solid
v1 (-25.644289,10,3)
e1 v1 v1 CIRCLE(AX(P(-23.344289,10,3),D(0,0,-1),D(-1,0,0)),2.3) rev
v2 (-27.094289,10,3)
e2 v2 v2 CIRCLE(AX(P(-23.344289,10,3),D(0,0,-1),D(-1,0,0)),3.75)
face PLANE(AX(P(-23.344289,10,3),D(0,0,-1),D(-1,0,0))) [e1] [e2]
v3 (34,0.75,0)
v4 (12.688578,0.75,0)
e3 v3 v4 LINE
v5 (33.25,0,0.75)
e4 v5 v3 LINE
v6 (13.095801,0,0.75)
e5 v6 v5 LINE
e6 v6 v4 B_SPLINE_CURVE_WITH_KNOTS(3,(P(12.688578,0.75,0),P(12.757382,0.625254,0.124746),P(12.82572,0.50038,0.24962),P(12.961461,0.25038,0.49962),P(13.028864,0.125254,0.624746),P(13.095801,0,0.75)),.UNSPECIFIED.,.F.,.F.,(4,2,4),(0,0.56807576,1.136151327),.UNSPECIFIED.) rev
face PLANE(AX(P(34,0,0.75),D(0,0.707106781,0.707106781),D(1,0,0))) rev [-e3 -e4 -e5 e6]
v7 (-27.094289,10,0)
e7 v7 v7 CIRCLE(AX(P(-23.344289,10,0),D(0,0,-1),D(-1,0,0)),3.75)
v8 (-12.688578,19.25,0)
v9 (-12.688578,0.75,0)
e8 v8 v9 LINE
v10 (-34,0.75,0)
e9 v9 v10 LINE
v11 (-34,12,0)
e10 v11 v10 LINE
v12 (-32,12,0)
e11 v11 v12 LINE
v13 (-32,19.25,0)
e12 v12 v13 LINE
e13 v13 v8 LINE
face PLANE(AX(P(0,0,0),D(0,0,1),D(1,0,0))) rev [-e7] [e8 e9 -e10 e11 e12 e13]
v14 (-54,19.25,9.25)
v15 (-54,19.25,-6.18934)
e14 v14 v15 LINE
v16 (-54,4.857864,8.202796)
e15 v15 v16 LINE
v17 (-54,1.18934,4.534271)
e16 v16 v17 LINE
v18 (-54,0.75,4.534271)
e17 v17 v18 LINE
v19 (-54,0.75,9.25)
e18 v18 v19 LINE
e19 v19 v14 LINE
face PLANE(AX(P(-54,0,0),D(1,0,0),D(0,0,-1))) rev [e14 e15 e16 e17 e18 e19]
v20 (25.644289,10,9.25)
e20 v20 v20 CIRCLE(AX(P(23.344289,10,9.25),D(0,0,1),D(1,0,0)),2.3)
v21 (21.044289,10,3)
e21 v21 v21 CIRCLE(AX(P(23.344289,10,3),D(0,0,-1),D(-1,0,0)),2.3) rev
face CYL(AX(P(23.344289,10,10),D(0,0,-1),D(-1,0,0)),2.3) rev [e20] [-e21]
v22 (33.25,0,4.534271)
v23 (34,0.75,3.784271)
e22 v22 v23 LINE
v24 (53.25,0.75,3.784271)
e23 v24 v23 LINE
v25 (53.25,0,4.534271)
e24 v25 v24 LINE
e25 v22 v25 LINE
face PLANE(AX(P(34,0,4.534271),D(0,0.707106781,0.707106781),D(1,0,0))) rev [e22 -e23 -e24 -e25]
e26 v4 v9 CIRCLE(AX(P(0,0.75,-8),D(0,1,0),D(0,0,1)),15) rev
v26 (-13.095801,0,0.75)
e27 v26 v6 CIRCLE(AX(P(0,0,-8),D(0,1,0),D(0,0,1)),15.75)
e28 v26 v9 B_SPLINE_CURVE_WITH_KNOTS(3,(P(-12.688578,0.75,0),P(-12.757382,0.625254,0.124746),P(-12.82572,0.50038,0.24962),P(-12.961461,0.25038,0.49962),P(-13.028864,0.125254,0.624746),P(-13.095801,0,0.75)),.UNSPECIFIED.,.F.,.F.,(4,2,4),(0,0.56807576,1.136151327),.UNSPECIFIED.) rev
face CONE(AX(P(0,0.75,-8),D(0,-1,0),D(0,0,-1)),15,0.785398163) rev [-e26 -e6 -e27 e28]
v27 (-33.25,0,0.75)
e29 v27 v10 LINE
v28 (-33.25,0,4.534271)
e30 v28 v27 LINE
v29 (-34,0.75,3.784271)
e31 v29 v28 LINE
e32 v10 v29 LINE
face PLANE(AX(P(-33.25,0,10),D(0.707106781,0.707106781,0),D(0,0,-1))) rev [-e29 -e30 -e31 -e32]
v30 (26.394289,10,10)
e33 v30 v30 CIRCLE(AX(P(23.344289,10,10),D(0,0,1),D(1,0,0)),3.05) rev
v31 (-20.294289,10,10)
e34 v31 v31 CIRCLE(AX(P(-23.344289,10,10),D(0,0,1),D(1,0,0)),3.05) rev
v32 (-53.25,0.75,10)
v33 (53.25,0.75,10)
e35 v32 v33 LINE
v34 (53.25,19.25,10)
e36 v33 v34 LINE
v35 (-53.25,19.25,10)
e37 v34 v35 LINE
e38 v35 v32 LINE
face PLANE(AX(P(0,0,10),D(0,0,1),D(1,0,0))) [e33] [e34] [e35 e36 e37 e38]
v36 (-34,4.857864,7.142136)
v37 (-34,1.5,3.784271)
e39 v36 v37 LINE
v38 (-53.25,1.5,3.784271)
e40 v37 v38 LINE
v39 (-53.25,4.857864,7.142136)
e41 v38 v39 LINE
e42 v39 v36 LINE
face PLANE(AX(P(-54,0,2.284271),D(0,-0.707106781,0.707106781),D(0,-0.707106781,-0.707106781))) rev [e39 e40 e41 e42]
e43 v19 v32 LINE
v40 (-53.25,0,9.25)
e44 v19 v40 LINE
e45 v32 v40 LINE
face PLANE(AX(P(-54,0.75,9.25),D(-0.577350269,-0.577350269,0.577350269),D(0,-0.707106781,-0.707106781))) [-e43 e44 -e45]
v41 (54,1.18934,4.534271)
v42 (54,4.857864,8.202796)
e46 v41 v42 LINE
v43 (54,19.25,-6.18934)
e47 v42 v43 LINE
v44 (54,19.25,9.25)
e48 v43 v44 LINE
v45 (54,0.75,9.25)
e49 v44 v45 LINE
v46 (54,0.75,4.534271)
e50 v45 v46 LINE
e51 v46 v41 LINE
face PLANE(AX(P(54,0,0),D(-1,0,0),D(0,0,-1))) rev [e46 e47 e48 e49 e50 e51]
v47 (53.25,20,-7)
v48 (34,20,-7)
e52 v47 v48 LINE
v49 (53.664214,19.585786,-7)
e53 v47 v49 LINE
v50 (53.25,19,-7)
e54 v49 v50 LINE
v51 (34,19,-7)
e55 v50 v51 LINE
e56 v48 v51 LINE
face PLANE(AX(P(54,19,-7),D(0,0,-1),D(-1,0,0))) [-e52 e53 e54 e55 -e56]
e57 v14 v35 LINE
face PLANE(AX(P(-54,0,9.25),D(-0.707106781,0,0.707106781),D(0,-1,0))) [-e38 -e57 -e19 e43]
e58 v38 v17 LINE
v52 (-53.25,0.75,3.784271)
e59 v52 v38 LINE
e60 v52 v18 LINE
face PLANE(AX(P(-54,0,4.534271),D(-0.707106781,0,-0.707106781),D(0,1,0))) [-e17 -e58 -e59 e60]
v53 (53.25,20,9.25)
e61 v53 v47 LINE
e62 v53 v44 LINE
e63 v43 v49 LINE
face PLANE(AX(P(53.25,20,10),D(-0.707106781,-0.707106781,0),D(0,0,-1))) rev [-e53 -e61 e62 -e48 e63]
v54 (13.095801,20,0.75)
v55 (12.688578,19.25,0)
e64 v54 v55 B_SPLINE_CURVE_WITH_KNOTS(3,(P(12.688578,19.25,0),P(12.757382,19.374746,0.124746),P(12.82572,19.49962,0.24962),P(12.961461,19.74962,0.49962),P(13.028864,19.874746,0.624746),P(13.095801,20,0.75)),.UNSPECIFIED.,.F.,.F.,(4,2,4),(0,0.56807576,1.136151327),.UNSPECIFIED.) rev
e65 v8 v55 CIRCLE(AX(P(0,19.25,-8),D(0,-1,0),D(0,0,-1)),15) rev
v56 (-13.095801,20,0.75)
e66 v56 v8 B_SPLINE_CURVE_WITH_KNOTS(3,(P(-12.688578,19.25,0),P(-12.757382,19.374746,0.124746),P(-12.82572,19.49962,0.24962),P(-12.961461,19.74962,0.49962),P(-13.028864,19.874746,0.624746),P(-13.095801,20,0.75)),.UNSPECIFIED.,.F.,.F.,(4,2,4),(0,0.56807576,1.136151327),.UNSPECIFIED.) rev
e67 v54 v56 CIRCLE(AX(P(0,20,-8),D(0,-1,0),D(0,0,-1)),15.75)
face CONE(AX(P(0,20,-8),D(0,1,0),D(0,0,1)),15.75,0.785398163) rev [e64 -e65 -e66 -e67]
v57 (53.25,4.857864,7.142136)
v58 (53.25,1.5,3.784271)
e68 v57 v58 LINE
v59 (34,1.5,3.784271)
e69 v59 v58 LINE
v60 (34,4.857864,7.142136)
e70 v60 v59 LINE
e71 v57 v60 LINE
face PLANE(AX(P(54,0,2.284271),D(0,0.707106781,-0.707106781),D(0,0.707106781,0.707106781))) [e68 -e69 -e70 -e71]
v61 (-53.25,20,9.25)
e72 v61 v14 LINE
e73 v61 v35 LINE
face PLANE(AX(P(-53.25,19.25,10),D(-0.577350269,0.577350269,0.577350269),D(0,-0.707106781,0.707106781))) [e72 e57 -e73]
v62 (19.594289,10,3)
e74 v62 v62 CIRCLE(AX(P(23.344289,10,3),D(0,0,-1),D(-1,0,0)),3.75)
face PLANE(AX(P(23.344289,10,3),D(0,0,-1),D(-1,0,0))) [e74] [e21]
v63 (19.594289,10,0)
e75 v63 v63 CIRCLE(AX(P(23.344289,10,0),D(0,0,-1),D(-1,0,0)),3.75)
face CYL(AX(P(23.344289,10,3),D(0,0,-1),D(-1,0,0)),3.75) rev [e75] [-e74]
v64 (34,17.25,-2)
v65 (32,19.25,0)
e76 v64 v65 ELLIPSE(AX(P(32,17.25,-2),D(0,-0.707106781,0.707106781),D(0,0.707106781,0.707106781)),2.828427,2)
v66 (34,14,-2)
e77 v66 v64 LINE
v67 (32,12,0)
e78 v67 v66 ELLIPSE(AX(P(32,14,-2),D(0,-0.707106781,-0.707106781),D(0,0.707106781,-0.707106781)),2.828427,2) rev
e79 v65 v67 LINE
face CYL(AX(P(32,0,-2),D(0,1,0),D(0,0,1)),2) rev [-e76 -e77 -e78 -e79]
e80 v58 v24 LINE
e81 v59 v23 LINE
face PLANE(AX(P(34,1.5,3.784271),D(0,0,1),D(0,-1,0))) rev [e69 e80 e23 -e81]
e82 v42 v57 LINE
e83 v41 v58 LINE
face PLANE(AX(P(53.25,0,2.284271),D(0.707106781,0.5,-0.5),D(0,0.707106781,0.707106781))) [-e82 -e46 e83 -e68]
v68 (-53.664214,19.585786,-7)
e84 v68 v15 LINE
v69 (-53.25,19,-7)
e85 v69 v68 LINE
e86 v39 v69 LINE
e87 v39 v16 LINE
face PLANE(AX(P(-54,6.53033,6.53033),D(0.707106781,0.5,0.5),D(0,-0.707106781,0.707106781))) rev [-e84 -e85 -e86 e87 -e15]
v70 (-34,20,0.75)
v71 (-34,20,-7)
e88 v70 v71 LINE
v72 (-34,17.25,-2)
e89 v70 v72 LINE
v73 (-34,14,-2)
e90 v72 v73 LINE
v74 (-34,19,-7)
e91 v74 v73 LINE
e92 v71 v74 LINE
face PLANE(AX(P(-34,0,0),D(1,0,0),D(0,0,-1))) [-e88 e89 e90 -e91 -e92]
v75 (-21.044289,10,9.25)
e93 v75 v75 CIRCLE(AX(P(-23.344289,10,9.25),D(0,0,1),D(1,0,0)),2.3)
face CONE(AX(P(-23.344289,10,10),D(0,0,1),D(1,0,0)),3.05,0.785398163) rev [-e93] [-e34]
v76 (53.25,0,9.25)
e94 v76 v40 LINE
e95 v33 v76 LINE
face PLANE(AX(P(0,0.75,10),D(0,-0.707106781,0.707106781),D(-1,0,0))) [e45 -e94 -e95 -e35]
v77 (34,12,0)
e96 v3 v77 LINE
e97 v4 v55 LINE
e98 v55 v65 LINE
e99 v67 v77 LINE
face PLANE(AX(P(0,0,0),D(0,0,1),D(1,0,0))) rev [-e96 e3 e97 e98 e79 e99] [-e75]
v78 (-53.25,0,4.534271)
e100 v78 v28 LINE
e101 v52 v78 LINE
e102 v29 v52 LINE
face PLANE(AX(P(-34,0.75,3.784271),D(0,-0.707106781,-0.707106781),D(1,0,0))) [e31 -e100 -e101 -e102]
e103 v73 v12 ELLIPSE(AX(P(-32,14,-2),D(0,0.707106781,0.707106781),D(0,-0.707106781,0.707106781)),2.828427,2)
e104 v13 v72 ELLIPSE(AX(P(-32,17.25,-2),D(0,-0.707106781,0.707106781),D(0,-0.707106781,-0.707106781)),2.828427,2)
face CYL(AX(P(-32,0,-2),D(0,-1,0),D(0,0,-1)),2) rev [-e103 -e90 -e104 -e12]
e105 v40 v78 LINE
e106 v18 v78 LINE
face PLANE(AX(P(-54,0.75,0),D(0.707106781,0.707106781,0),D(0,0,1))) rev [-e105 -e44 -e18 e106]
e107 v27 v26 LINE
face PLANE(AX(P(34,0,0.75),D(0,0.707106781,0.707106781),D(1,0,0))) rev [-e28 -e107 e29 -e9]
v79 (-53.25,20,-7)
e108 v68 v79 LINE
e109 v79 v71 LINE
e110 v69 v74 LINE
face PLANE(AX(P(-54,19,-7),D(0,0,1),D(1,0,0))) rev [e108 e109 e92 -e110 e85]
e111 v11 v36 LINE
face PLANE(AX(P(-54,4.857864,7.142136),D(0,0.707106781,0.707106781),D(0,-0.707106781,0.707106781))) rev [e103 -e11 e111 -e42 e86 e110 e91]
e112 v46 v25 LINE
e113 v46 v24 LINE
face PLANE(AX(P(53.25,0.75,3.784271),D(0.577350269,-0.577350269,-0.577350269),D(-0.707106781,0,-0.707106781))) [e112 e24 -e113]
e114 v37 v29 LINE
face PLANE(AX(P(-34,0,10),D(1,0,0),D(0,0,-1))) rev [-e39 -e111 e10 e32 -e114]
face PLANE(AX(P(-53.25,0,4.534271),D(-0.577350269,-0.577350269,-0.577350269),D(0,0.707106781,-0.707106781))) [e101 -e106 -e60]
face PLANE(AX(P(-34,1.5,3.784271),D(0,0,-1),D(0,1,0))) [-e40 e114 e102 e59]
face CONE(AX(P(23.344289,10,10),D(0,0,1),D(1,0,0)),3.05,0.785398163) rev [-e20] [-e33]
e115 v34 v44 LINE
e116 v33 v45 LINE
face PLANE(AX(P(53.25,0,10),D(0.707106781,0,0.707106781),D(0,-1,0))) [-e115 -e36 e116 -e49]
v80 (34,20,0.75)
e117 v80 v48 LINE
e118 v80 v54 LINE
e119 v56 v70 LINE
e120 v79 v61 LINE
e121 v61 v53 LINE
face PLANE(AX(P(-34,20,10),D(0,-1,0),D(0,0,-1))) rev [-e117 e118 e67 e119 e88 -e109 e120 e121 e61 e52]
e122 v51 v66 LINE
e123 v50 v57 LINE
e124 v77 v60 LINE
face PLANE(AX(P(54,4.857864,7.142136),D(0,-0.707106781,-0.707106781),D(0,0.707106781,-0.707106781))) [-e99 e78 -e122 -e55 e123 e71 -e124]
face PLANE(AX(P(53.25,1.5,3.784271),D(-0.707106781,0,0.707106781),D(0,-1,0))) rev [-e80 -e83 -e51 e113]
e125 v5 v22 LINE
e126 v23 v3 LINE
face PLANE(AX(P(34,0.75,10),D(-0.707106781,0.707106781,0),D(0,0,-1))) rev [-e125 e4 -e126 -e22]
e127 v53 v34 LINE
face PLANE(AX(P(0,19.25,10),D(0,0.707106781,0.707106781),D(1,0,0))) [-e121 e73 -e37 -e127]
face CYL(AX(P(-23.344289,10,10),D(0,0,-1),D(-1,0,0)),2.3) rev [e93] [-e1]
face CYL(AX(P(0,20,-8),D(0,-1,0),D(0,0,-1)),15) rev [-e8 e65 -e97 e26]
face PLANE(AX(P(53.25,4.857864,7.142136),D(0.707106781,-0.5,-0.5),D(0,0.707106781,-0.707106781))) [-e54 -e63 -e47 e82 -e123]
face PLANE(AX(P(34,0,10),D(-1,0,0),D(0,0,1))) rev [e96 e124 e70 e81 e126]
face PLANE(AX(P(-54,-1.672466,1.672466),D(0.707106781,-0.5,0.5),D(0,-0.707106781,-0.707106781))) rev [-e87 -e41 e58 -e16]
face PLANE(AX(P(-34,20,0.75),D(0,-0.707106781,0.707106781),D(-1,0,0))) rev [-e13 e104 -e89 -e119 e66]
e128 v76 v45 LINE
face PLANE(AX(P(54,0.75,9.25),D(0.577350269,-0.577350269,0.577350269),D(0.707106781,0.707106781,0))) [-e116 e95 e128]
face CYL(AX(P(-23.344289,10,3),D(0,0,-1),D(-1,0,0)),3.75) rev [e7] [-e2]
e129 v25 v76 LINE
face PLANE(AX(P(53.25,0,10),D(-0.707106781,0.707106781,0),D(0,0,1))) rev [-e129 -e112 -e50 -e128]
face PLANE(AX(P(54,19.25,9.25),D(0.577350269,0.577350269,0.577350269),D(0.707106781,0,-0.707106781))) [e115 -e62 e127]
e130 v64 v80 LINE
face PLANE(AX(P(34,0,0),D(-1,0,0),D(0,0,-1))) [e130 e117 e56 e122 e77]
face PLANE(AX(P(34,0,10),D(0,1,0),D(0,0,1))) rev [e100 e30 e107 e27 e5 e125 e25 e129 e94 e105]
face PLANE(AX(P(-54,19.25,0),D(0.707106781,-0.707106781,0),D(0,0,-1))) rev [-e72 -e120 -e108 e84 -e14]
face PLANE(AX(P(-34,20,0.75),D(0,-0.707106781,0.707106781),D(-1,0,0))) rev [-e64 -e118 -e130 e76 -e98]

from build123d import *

# Parameters (mm, degrees)
SKIZZE1_W                       = 68
SKIZZE1_H                       = 20
AUFSATZ_LINEAR_AUSTRAGEN1_DEPTH = 10
AUFSATZ_LINEAR_AUSTRAGEN2_DEPTH = 20
SKIZZE3_R                       = 15
SCHNITT_LINEAR_AUSTRAGEN1_DEPTH = 20
SKIZZE4_R                       = 2.3
SCHNITT_LINEAR_AUSTRAGEN2_DEPTH = 10
SKIZZE5_R                       = 3.75
SCHNITT_LINEAR_AUSTRAGEN3_DEPTH = 3
SCHNITT_LINEAR_AUSTRAGEN4_DEPTH = 20
VERRUNDUNG1_R                   = 2


with BuildPart() as part:
    # Skizze1 → Aufsatz-Linear austragen1 (new body)
    with BuildSketch(Plane.XY):
        with Locations((0, 10)):
            Rectangle(SKIZZE1_W, SKIZZE1_H)
    extrude(amount=AUFSATZ_LINEAR_AUSTRAGEN1_DEPTH)

    # Skizze2 → Aufsatz-Linear austragen2 (add)
    with BuildSketch(Plane.ZY.offset(34)):
        Polygon((7.142135624, 4.857864376), (-7, 19), (-7, 20), (0, 20), (10, 20), (10, 0), (2.284271247, 0), align=None)
    aufsatz_linear_austragen2 = extrude(amount=AUFSATZ_LINEAR_AUSTRAGEN2_DEPTH)

    # Spiegeln1: Aufsatz-Linear austragen2 across plane
    add(aufsatz_linear_austragen2.mirror(Plane(origin=(0, 0, 0), x_dir=(0, 0, 1), z_dir=(1, 0, 0))))

    # Skizze3 → Schnitt-Linear austragen1 (cut)
    with BuildSketch(Plane.XZ):
        with Locations((0, -8)):
            Circle(SKIZZE3_R)
    extrude(amount=-SCHNITT_LINEAR_AUSTRAGEN1_DEPTH, mode=Mode.SUBTRACT)

    # Skizze4 → Schnitt-Linear austragen2 (cut)
    with BuildSketch(Plane(origin=(0, 0, 0), x_dir=(-1, 0, 0), z_dir=(0, 0, -1))):
        with Locations((-23.34428877, 10)):
            Circle(SKIZZE4_R)
        with Locations(Location((23.34428877, 10, 0), (0, 0, 180))):
            Circle(SKIZZE4_R)
    extrude(amount=-SCHNITT_LINEAR_AUSTRAGEN2_DEPTH, mode=Mode.SUBTRACT)

    # Skizze5 → Schnitt-Linear austragen3 (cut)
    with BuildSketch(Plane(origin=(0, 0, 0), x_dir=(-1, 0, 0), z_dir=(0, 0, -1))):
        with Locations((-23.34428877, 10)):
            Circle(SKIZZE5_R)
        with Locations((23.34428877, 10)):
            Circle(SKIZZE5_R)
    extrude(amount=-SCHNITT_LINEAR_AUSTRAGEN3_DEPTH, mode=Mode.SUBTRACT)

    # Skizze6 → Schnitt-Linear austragen4 (cut)
    with BuildSketch(Plane(origin=(54, 0, 0), x_dir=(0, 0, -1), z_dir=(1, 0, 0))):
        Polygon((-3.784271247, 1.5), (-3.784271247, 0), (-1.831080062, -0.949282867), (-1.396270995, 1.527811212), align=None)
    schnitt_linear_austragen4 = extrude(amount=-SCHNITT_LINEAR_AUSTRAGEN4_DEPTH, mode=Mode.SUBTRACT)

    # Spiegeln2: Schnitt-Linear austragen4 across plane
    add(schnitt_linear_austragen4.mirror(Plane(origin=(0, 0, 0), x_dir=(0, 0, 1), z_dir=(1, 0, 0))), mode=Mode.SUBTRACT)

    # Fase1
    # the kernel refuses this chamfer: 0.75 mm, written as the material it takes off along each edge
    with BuildSketch(Plane(origin=(53.5, 19.5, 9.5), x_dir=(-0.7071067811865476, 0.7071067811865476, 0), z_dir=(0.5773502691896257, 0.5773502691896257, 0.5773502691896257)), Plane(origin=(-53.5, 19.5, 9.5), x_dir=(-0.7071067811865476, -0.7071067811865476, 0), z_dir=(-0.5773502691896257, 0.5773502691896257, 0.5773502691896257))) as fase1_piece_1:
        Polygon((-0.530330086, -0.306186218), (0.530330086, -0.306186218), (0, 0.612372436), align=None)
    extrude(amount=0.952627944, mode=Mode.SUBTRACT)
    with BuildSketch(Plane(origin=(53.5, 0.5, 4.284271247), x_dir=(-0.7071067811865476, -1.2560739669470201e-15, -0.7071067811865476), z_dir=(0.5773502691896262, -0.577350269189626, -0.5773502691896252)), Plane(origin=(-53.5, 0.5, 9.5), x_dir=(-0.7071067811865476, 0.7071067811865474, 0), z_dir=(-0.5773502691896256, -0.5773502691896258, 0.5773502691896258)), Plane(origin=(-53.5, 0.5, 4.284271247), x_dir=(0, 0.707106781186547, -0.707106781186548), z_dir=(-0.577350269189626, -0.5773502691896262, -0.5773502691896253)), Plane(origin=(53.5, 0.5, 9.5), x_dir=(-0.7071067811865476, -0.7071067811865475, 0), z_dir=(0.5773502691896257, -0.5773502691896258, 0.5773502691896258))) as fase1_piece_2:
        Polygon((-0.530330086, 0.306186218), (0.530330086, 0.306186218), (0, -0.612372436), align=None)
    extrude(amount=0.952627944, mode=Mode.SUBTRACT)
    with BuildSketch(Plane(origin=(-23.34428877, 10, 10), x_dir=(1, 0, 0), z_dir=(0, 1, 0))) as fase1_piece_3:
        with BuildLine():
            Line((2.278786797, 0.771213203), (3.071213203, -0.021213203))
            Line((3.071213203, -0.021213203), (3.071213203, -0.036213203))
            ThreePointArc((3.071213203, -0.036213203), (2.685606602, -0.015), (2.3, -0.015))
            Line((2.3, -0.015), (2.285, 0))
            ThreePointArc((2.285, 0), (2.285, 0.385606602), (2.263786797, 0.771213203))
            Line((2.263786797, 0.771213203), (2.278786797, 0.771213203))
        make_face()
    revolve(axis=Axis((-23.34428877, 10, 10), (0, 0, -1)), mode=Mode.SUBTRACT)
    with BuildSketch(Plane(origin=(23.34428877, 10, 10), x_dir=(-1, 0, 0), z_dir=(0, -1, 0))) as fase1_piece_4:
        with BuildLine():
            Line((3.071213203, -0.021213203), (2.278786797, 0.771213203))
            Line((2.278786797, 0.771213203), (2.263786797, 0.771213203))
            ThreePointArc((2.263786797, 0.771213203), (2.285, 0.385606602), (2.285, 0))
            Line((2.285, 0), (2.3, -0.015))
            ThreePointArc((2.3, -0.015), (2.685606602, -0.015), (3.071213203, -0.036213203))
            Line((3.071213203, -0.036213203), (3.071213203, -0.021213203))
        make_face()
    revolve(axis=Axis((23.34428877, 10, 10), (0, 0, -1)), mode=Mode.SUBTRACT)
    with BuildSketch(Plane(origin=(54, 20, 0), x_dir=(-0.9996219169112968, 0.027495876610586893, 0), z_dir=(0, 0, 1))) as fase1_piece_5:
        with BuildLine():
            Line((0.771504896, 0), (-0.042410366, 0.770338345))
            Line((-0.042410366, 0.770338345), (-0.057404695, 0.769925907))
            ThreePointArc((-0.057404695, 0.769925907), (-0.02559692, 0.385048372), (-0.014994329, -0.000412438))
            Line((-0.014994329, -0.000412438), (0.000412438, -0.014994329))
            ThreePointArc((0.000412438, -0.014994329), (0.385873249, -0.004391737), (0.771917335, -0.014994329))
            Line((0.771917335, -0.014994329), (0.771504896, 0))
        make_face()
    extrude(amount=11.928762241, mode=Mode.SUBTRACT)
    with BuildSketch(Plane(origin=(54, 4.857864376, 7.142135624), x_dir=(-0.9996219169112968, -0.01944252080601377, -0.01944252080601398), z_dir=(0, 0.7071067811865513, -0.7071067811865438)), Plane(origin=(55.928762241, 0, 3.784271247), x_dir=(0, -0.027495876610586376, 0.9996219169112968), z_dir=(-1, 0, 0))) as fase1_piece_6:
        with BuildLine():
            Line((0.771504896, 0), (-0.042410366, 0.770338345))
            Line((-0.042410366, 0.770338345), (-0.057404695, 0.769925907))
            ThreePointArc((-0.057404695, 0.769925907), (-0.02559692, 0.385048372), (-0.014994329, -0.000412438))
            Line((-0.014994329, -0.000412438), (0.000412438, -0.014994329))
            ThreePointArc((0.000412438, -0.014994329), (0.385873249, -0.004391737), (0.771917335, -0.014994329))
            Line((0.771917335, -0.014994329), (0.771504896, 0))
        make_face()
    extrude(amount=21.928762241, mode=Mode.SUBTRACT)
    with BuildSketch(Plane(origin=(54, 0.13615914, 2.420430388), x_dir=(-0.9996219169112968, 0.01944252080601445, -0.019442520806014447), z_dir=(0, 0.7071067811865475, 0.7071067811865476))) as fase1_piece_7:
        with BuildLine():
            Line((0.771504896, 0), (-0.042410366, 0.770338345))
            Line((-0.042410366, 0.770338345), (-0.057404695, 0.769925907))
            ThreePointArc((-0.057404695, 0.769925907), (-0.02559692, 0.385048372), (-0.014994329, -0.000412438))
            Line((-0.014994329, -0.000412438), (0.000412438, -0.014994329))
            ThreePointArc((0.000412438, -0.014994329), (0.385873249, -0.004391737), (0.771917335, -0.014994329))
            Line((0.771917335, -0.014994329), (0.771504896, 0))
        make_face()
    extrude(amount=6.677499583, mode=Mode.SUBTRACT)
    with BuildSketch(Plane(origin=(54, 3.428762241, 3.784271247), x_dir=(0.027495876610582164, 0, 0.9996219169112969), z_dir=(0, -1, 0)), Plane(origin=(-54, 3.428762241, 3.784271247), x_dir=(0.9996219169112968, 0, -0.027495876610586317), z_dir=(0, -1, 0))) as fase1_piece_8:
        with BuildLine():
            Line((0.771504896, 0), (-0.042410366, 0.770338345))
            Line((-0.042410366, 0.770338345), (-0.057404695, 0.769925907))
            ThreePointArc((-0.057404695, 0.769925907), (-0.02559692, 0.385048372), (-0.014994329, -0.000412438))
            Line((-0.014994329, -0.000412438), (0.000412438, -0.014994329))
            ThreePointArc((0.000412438, -0.014994329), (0.385873249, -0.004391737), (0.771917335, -0.014994329))
            Line((0.771917335, -0.014994329), (0.771504896, 0))
        make_face()
    extrude(amount=5.357524482, mode=Mode.SUBTRACT)
    with BuildSketch(Plane(origin=(-54, 0, 11.928762241), x_dir=(0.9996219169112968, -0.027495876610586487, 0), z_dir=(0, 0, -1))) as fase1_piece_9:
        with BuildLine():
            Line((0.771504896, 0), (-0.042410366, -0.770338345))
            Line((-0.042410366, -0.770338345), (-0.057404695, -0.769925907))
            ThreePointArc((-0.057404695, -0.769925907), (-0.02559692, -0.385048372), (-0.014994329, 0.000412438))
            Line((-0.014994329, 0.000412438), (0.000412438, 0.014994329))
            ThreePointArc((0.000412438, 0.014994329), (0.385873249, 0.004391737), (0.771917335, 0.014994329))
            Line((0.771917335, 0.014994329), (0.771504896, 0))
        make_face()
    extrude(amount=10.073253234, mode=Mode.SUBTRACT)
    with BuildSketch(Plane(origin=(54, 21.928762241, 10), x_dir=(-0.9996219169112968, 0, 0.027495876610586893), z_dir=(0, -1, 0)), Plane(origin=(-54, 21.928762241, 10), x_dir=(-0.027495876610582164, 0, -0.9996219169112969), z_dir=(0, -1, 0))) as fase1_piece_10:
        with BuildLine():
            Line((0.771504896, 0), (-0.042410366, 0.770338345))
            Line((-0.042410366, 0.770338345), (-0.057404695, 0.769925907))
            ThreePointArc((-0.057404695, 0.769925907), (-0.02559692, 0.385048372), (-0.014994329, -0.000412438))
            Line((-0.014994329, -0.000412438), (0.000412438, -0.014994329))
            ThreePointArc((0.000412438, -0.014994329), (0.385873249, -0.004391737), (0.771917335, -0.014994329))
            Line((0.771917335, -0.014994329), (0.771504896, 0))
        make_face()
    extrude(amount=23.857524482, mode=Mode.SUBTRACT)
    with BuildSketch(Plane(origin=(55.928762241, 20, 10), x_dir=(0, 0.027495876610586768, -0.9996219169112968), z_dir=(-1, 0, 0))) as fase1_piece_11:
        with BuildLine():
            Line((0.771504896, 0), (-0.042410366, 0.770338345))
            Line((-0.042410366, 0.770338345), (-0.057404695, 0.769925907))
            ThreePointArc((-0.057404695, 0.769925907), (-0.02559692, 0.385048372), (-0.014994329, -0.000412438))
            Line((-0.014994329, -0.000412438), (0.000412438, -0.014994329))
            ThreePointArc((0.000412438, -0.014994329), (0.385873249, -0.004391737), (0.771917335, -0.014994329))
            Line((0.771917335, -0.014994329), (0.771504896, 0))
        make_face()
    extrude(amount=111.857524482, mode=Mode.SUBTRACT)
    with BuildSketch(Plane(origin=(55.928762241, 0, 10), x_dir=(0, -0.02749587661058636, -0.9996219169112968), z_dir=(-1, 0, 0))) as fase1_piece_12:
        with BuildLine():
            Line((0.771504896, 0), (-0.042410366, -0.770338345))
            Line((-0.042410366, -0.770338345), (-0.057404695, -0.769925907))
            ThreePointArc((-0.057404695, -0.769925907), (-0.02559692, -0.385048372), (-0.014994329, 0.000412438))
            Line((-0.014994329, 0.000412438), (0.000412438, 0.014994329))
            ThreePointArc((0.000412438, 0.014994329), (0.385873249, 0.004391737), (0.771917335, 0.014994329))
            Line((0.771917335, 0.014994329), (0.771504896, 0))
        make_face()
    extrude(amount=111.857524482, mode=Mode.SUBTRACT)
    with BuildSketch(Plane(origin=(54, 0, 11.928762241), x_dir=(-0.9996219169112968, -0.027495876610586487, 0), z_dir=(0, 0, -1))) as fase1_piece_13:
        with BuildLine():
            Line((0.771504896, 0), (-0.042410366, 0.770338345))
            Line((-0.042410366, 0.770338345), (-0.057404695, 0.769925907))
            ThreePointArc((-0.057404695, 0.769925907), (-0.02559692, 0.385048372), (-0.014994329, -0.000412438))
            Line((-0.014994329, -0.000412438), (0.000412438, -0.014994329))
            ThreePointArc((0.000412438, -0.014994329), (0.385873249, -0.004391737), (0.771917335, -0.014994329))
            Line((0.771917335, -0.014994329), (0.771504896, 0))
        make_face()
    extrude(amount=10.073253234, mode=Mode.SUBTRACT)
    with BuildSketch(Plane(origin=(34, 0, -1.928762241), x_dir=(-0.9996219169112968, -0.027495876610586487, 0), z_dir=(0, 0, 1)), Plane(origin=(-34, 0, 3.784271247), x_dir=(0.9996219169112968, -0.027495876610585248, 0), z_dir=(0, 0, -1))) as fase1_piece_14:
        with BuildLine():
            Line((0.771504896, 0), (-0.042410366, -0.770338345))
            Line((-0.042410366, -0.770338345), (-0.057404695, -0.769925907))
            ThreePointArc((-0.057404695, -0.769925907), (-0.02559692, -0.385048372), (-0.014994329, 0.000412438))
            Line((-0.014994329, 0.000412438), (0.000412438, 0.014994329))
            ThreePointArc((0.000412438, 0.014994329), (0.385873249, 0.004391737), (0.771917335, 0.014994329))
            Line((0.771917335, 0.014994329), (0.771504896, 0))
        make_face()
    extrude(amount=5.713033488, mode=Mode.SUBTRACT)
    with BuildSketch(Plane(origin=(35.928762241, 0, 0), x_dir=(0, -0.027495876610586372, 0.9996219169112968), z_dir=(-1, 0, 0)), Plane(origin=(-10.759815299, 0, 0), x_dir=(0, -0.027495876610586372, 0.9996219169112968), z_dir=(-1, 0, 0))) as fase1_piece_15:
        with BuildLine():
            Line((0.771504896, 0), (-0.042410366, 0.770338345))
            Line((-0.042410366, 0.770338345), (-0.057404695, 0.769925907))
            ThreePointArc((-0.057404695, 0.769925907), (-0.02559692, 0.385048372), (-0.014994329, -0.000412438))
            Line((-0.014994329, -0.000412438), (0.000412438, -0.014994329))
            ThreePointArc((0.000412438, -0.014994329), (0.385873249, -0.004391737), (0.771917335, -0.014994329))
            Line((0.771917335, -0.014994329), (0.771504896, 0))
        make_face()
    extrude(amount=25.168946941, mode=Mode.SUBTRACT)
    with BuildSketch(Plane(origin=(0, 0, -8), x_dir=(0.9073469377071577, 0, 0.42038260505573166), z_dir=(0.42038260505573166, 0, -0.9073469377071577))) as fase1_piece_16:
        with BuildLine():
            Line((15.771213203, 0.021213203), (14.978786797, -0.771213203))
            Line((14.978786797, -0.771213203), (14.963786797, -0.771213203))
            ThreePointArc((14.963786797, -0.771213203), (14.985, -0.385606602), (14.985, 0))
            Line((14.985, 0), (15, 0.015))
            ThreePointArc((15, 0.015), (15.385606602, 0.015), (15.771213203, 0.036213203))
            Line((15.771213203, 0.036213203), (15.771213203, 0.021213203))
        make_face()
    revolve(axis=Axis((0, 0, -8), (0, -1, 0)), revolution_arc=130.282509401, mode=Mode.SUBTRACT)
    with BuildSketch(Plane(origin=(-55.928762241, 0, 3.784271247), x_dir=(0, -0.027495876610586376, 0.9996219169112968), z_dir=(1, 0, 0)), Plane(origin=(-54, 4.857864376, 7.142135624), x_dir=(0.9996219169112968, -0.01944252080601377, -0.01944252080601398), z_dir=(0, 0.7071067811865513, -0.7071067811865438))) as fase1_piece_17:
        with BuildLine():
            Line((0.771504896, 0), (-0.042410366, -0.770338345))
            Line((-0.042410366, -0.770338345), (-0.057404695, -0.769925907))
            ThreePointArc((-0.057404695, -0.769925907), (-0.02559692, -0.385048372), (-0.014994329, 0.000412438))
            Line((-0.014994329, 0.000412438), (0.000412438, 0.014994329))
            ThreePointArc((0.000412438, 0.014994329), (0.385873249, 0.004391737), (0.771917335, 0.014994329))
            Line((0.771917335, 0.014994329), (0.771504896, 0))
        make_face()
    extrude(amount=21.928762241, mode=Mode.SUBTRACT)
    with BuildSketch(Plane(origin=(-54, 0.13615914, 2.420430388), x_dir=(0.9996219169112968, 0.01944252080601436, -0.019442520806014357), z_dir=(0, 0.7071067811865475, 0.7071067811865476))) as fase1_piece_18:
        with BuildLine():
            Line((0.771504896, 0), (-0.042410366, -0.770338345))
            Line((-0.042410366, -0.770338345), (-0.057404695, -0.769925907))
            ThreePointArc((-0.057404695, -0.769925907), (-0.02559692, -0.385048372), (-0.014994329, 0.000412438))
            Line((-0.014994329, 0.000412438), (0.000412438, 0.014994329))
            ThreePointArc((0.000412438, 0.014994329), (0.385873249, 0.004391737), (0.771917335, 0.014994329))
            Line((0.771917335, 0.014994329), (0.771504896, 0))
        make_face()
    extrude(amount=6.677499583, mode=Mode.SUBTRACT)
    with BuildSketch(Plane(origin=(-34, 20, 0), x_dir=(0, 0.027495876610586778, 0.9996219169112968), z_dir=(1, 0, 0)), Plane(origin=(10.759815299, 20, 0), x_dir=(0, 0.027495876610586778, 0.9996219169112968), z_dir=(1, 0, 0))) as fase1_piece_19:
        with BuildLine():
            Line((0.771504896, 0), (-0.042410366, 0.770338345))
            Line((-0.042410366, 0.770338345), (-0.057404695, 0.769925907))
            ThreePointArc((-0.057404695, 0.769925907), (-0.02559692, 0.385048372), (-0.014994329, -0.000412438))
            Line((-0.014994329, -0.000412438), (0.000412438, -0.014994329))
            ThreePointArc((0.000412438, -0.014994329), (0.385873249, -0.004391737), (0.771917335, -0.014994329))
            Line((0.771917335, -0.014994329), (0.771504896, 0))
        make_face()
    extrude(amount=23.240184701, mode=Mode.SUBTRACT)
    with BuildSketch(Plane(origin=(0, 20, -8), x_dir=(0.9073469377071578, 0, 0.42038260505573166), z_dir=(0.42038260505573166, 0, -0.9073469377071578))) as fase1_piece_20:
        with BuildLine():
            Line((14.978786797, 0.771213203), (15.771213203, -0.021213203))
            Line((15.771213203, -0.021213203), (15.771213203, -0.036213203))
            ThreePointArc((15.771213203, -0.036213203), (15.385606602, -0.015), (15, -0.015))
            Line((15, -0.015), (14.985, 0))
            ThreePointArc((14.985, 0), (14.985, 0.385606602), (14.963786797, 0.771213203))
            Line((14.963786797, 0.771213203), (14.978786797, 0.771213203))
        make_face()
    revolve(axis=Axis((0, 20, -8), (0, -1, 0)), revolution_arc=130.282509401, mode=Mode.SUBTRACT)
    with BuildSketch(Plane(origin=(-54, 20, 0), x_dir=(0.9996219169112968, 0.027495876610586893, 0), z_dir=(0, 0, 1))) as fase1_piece_21:
        with BuildLine():
            Line((0.771504896, 0), (-0.042410366, -0.770338345))
            Line((-0.042410366, -0.770338345), (-0.057404695, -0.769925907))
            ThreePointArc((-0.057404695, -0.769925907), (-0.02559692, -0.385048372), (-0.014994329, 0.000412438))
            Line((-0.014994329, 0.000412438), (0.000412438, 0.014994329))
            ThreePointArc((0.000412438, 0.014994329), (0.385873249, 0.004391737), (0.771917335, 0.014994329))
            Line((0.771917335, 0.014994329), (0.771504896, 0))
        make_face()
    extrude(amount=11.928762241, mode=Mode.SUBTRACT)
    with BuildSketch(Plane(origin=(-54, 20, -8.928762241), x_dir=(0.9996219169112968, 0.027495876610586893, -2.912407812628222e-14), z_dir=(0, 1.059216206806384e-12, 1.0))) as fase1_piece_22:
        with BuildLine():
            Line((0.771504896, 0), (-0.042410366, -0.770338345))
            Line((-0.042410366, -0.770338345), (-0.057404695, -0.769925907))
            ThreePointArc((-0.057404695, -0.769925907), (-0.02559692, -0.385048372), (-0.014994329, 0.000412438))
            Line((-0.014994329, 0.000412438), (0.000412438, 0.014994329))
            ThreePointArc((0.000412438, 0.014994329), (0.385873249, 0.004391737), (0.771917335, 0.014994329))
            Line((0.771917335, 0.014994329), (0.771504896, 0))
        make_face()
    extrude(amount=8.928762241, mode=Mode.SUBTRACT)
    with BuildSketch(Plane(origin=(54, 20, -8.928762241), x_dir=(-0.9996219169112968, 0.027495876610586893, -2.912407812628222e-14), z_dir=(0, 1.059216206806384e-12, 1.0))) as fase1_piece_23:
        with BuildLine():
            Line((0.771504896, 0), (-0.042410366, 0.770338345))
            Line((-0.042410366, 0.770338345), (-0.057404695, 0.769925907))
            ThreePointArc((-0.057404695, 0.769925907), (-0.02559692, 0.385048372), (-0.014994329, -0.000412438))
            Line((-0.014994329, -0.000412438), (0.000412438, -0.014994329))
            ThreePointArc((0.000412438, -0.014994329), (0.385873249, -0.004391737), (0.771917335, -0.014994329))
            Line((0.771917335, -0.014994329), (0.771504896, 0))
        make_face()
    extrude(amount=8.928762241, mode=Mode.SUBTRACT)
    with BuildSketch(Plane(origin=(54, 3.494023516, 8.505976484), x_dir=(-0.9996219169112968, -0.01944252080601521, -0.019442520806015415), z_dir=(0, 0.7071067811865513, -0.7071067811865438))) as fase1_piece_24a_section:
        with BuildLine():
            Line((0.771504896, 0), (-0.042410366, 0.770338345))
            Line((-0.042410366, 0.770338345), (-0.057404695, 0.769925907))
            ThreePointArc((-0.057404695, 0.769925907), (-0.02559692, 0.385048372), (-0.014994329, -0.000412438))
            Line((-0.014994329, -0.000412438), (0.000412438, -0.014994329))
            ThreePointArc((0.000412438, -0.014994329), (0.385873249, -0.004391737), (0.771917335, -0.014994329))
            Line((0.771917335, -0.014994329), (0.771504896, 0))
        make_face()
    fase1_piece_24a = extrude(amount=23.857524482, mode=Mode.PRIVATE)
    fase1_piece_24a = split(fase1_piece_24a, bisect_by=Plane(origin=(53.75265478, 5.032763859, 7.317035106), z_dir=(0, -0.7071067811865476, 0.7071067811865475)), keep=Keep.TOP, mode=Mode.PRIVATE)
    with BuildSketch(Plane(origin=(54, 0.13615914, 2.420430388), x_dir=(-0.9996219169112968, 0.01944252080601445, -0.019442520806014447), z_dir=(0, 0.7071067811865475, 0.7071067811865476))) as fase1_piece_24b_section:
        with BuildLine():
            Line((0.771504896, 0), (-0.042410366, 0.770338345))
            Line((-0.042410366, 0.770338345), (-0.057404695, 0.769925907))
            ThreePointArc((-0.057404695, 0.769925907), (-0.02559692, 0.385048372), (-0.014994329, -0.000412438))
            Line((-0.014994329, -0.000412438), (0.000412438, -0.014994329))
            ThreePointArc((0.000412438, -0.014994329), (0.385873249, -0.004391737), (0.771917335, -0.014994329))
            Line((0.771917335, -0.014994329), (0.771504896, 0))
        make_face()
    fase1_piece_24b = extrude(amount=8.606261823, mode=Mode.PRIVATE)
    fase1_piece_24b = split(fase1_piece_24b, bisect_by=Plane(origin=(53.75265478, 4.682964894, 7.317035106), z_dir=(0, 0.7071067811865438, 0.7071067811865513)), keep=Keep.TOP, mode=Mode.PRIVATE)
    fase1_piece_24 = fase1_piece_24a & fase1_piece_24b
    add(fase1_piece_24, mode=Mode.SUBTRACT)
    with BuildSketch(Plane(origin=(34, 0, -1.928762241), x_dir=(-0.9996219169112968, -0.027495876610586487, 0), z_dir=(0, 0, 1))) as fase1_piece_25a_section:
        with BuildLine():
            Line((0.771504896, 0), (-0.042410366, -0.770338345))
            Line((-0.042410366, -0.770338345), (-0.057404695, -0.769925907))
            ThreePointArc((-0.057404695, -0.769925907), (-0.02559692, -0.385048372), (-0.014994329, 0.000412438))
            Line((-0.014994329, 0.000412438), (0.000412438, 0.014994329))
            ThreePointArc((0.000412438, 0.014994329), (0.385873249, 0.004391737), (0.771917335, 0.014994329))
            Line((0.771917335, 0.014994329), (0.771504896, 0))
        make_face()
    fase1_piece_25a = extrude(amount=7.641795729, mode=Mode.PRIVATE)
    fase1_piece_25a = split(fase1_piece_25a, bisect_by=Plane(origin=(33.75265478, 0.24734522, 3.784271247), z_dir=(0, 0, 1)), keep=Keep.TOP, mode=Mode.PRIVATE)
    with BuildSketch(Plane(origin=(55.928762241, 0, 3.784271247), x_dir=(0, -0.027495876610586376, 0.9996219169112968), z_dir=(-1, 0, 0))) as fase1_piece_25b_section:
        with BuildLine():
            Line((0.771504896, 0), (-0.042410366, 0.770338345))
            Line((-0.042410366, 0.770338345), (-0.057404695, 0.769925907))
            ThreePointArc((-0.057404695, 0.769925907), (-0.02559692, 0.385048372), (-0.014994329, -0.000412438))
            Line((-0.014994329, -0.000412438), (0.000412438, -0.014994329))
            ThreePointArc((0.000412438, -0.014994329), (0.385873249, -0.004391737), (0.771917335, -0.014994329))
            Line((0.771917335, -0.014994329), (0.771504896, 0))
        make_face()
    fase1_piece_25b = extrude(amount=23.857524482, mode=Mode.PRIVATE)
    fase1_piece_25b = split(fase1_piece_25b, bisect_by=Plane(origin=(34, 0.24734522, 4.031616468), z_dir=(-1, 0, 0)), keep=Keep.TOP, mode=Mode.PRIVATE)
    fase1_piece_25 = fase1_piece_25a & fase1_piece_25b
    add(fase1_piece_25, mode=Mode.SUBTRACT)
    with BuildSketch(Plane(origin=(-55.928762241, 0, 3.784271247), x_dir=(0, -0.027495876610586376, 0.9996219169112968), z_dir=(1, 0, 0))) as fase1_piece_26a_section:
        with BuildLine():
            Line((0.771504896, 0), (-0.042410366, -0.770338345))
            Line((-0.042410366, -0.770338345), (-0.057404695, -0.769925907))
            ThreePointArc((-0.057404695, -0.769925907), (-0.02559692, -0.385048372), (-0.014994329, 0.000412438))
            Line((-0.014994329, 0.000412438), (0.000412438, 0.014994329))
            ThreePointArc((0.000412438, 0.014994329), (0.385873249, 0.004391737), (0.771917335, 0.014994329))
            Line((0.771917335, 0.014994329), (0.771504896, 0))
        make_face()
    fase1_piece_26a = extrude(amount=23.857524482, mode=Mode.PRIVATE)
    fase1_piece_26a = split(fase1_piece_26a, bisect_by=Plane(origin=(-34, 0.24734522, 4.031616468), z_dir=(1, 0, 0)), keep=Keep.TOP, mode=Mode.PRIVATE)
    with BuildSketch(Plane(origin=(-34, 0, 5.713033488), x_dir=(0.9996219169112968, -0.027495876610586487, 0), z_dir=(0, 0, -1))) as fase1_piece_26b_section:
        with BuildLine():
            Line((0.771504896, 0), (-0.042410366, -0.770338345))
            Line((-0.042410366, -0.770338345), (-0.057404695, -0.769925907))
            ThreePointArc((-0.057404695, -0.769925907), (-0.02559692, -0.385048372), (-0.014994329, 0.000412438))
            Line((-0.014994329, 0.000412438), (0.000412438, 0.014994329))
            ThreePointArc((0.000412438, 0.014994329), (0.385873249, 0.004391737), (0.771917335, 0.014994329))
            Line((0.771917335, 0.014994329), (0.771504896, 0))
        make_face()
    fase1_piece_26b = extrude(amount=7.641795729, mode=Mode.PRIVATE)
    fase1_piece_26b = split(fase1_piece_26b, bisect_by=Plane(origin=(-33.75265478, 0.24734522, 3.784271247), z_dir=(0, 0, 1)), keep=Keep.TOP, mode=Mode.PRIVATE)
    fase1_piece_26 = fase1_piece_26a & fase1_piece_26b
    add(fase1_piece_26, mode=Mode.SUBTRACT)
    with BuildSketch(Plane(origin=(-54, 3.494023516, 8.505976484), x_dir=(0.9996219169112968, -0.019442520806014923, -0.019442520806015127), z_dir=(0, 0.7071067811865513, -0.7071067811865438))) as fase1_piece_27a_section:
        with BuildLine():
            Line((0.771504896, 0), (-0.042410366, -0.770338345))
            Line((-0.042410366, -0.770338345), (-0.057404695, -0.769925907))
            ThreePointArc((-0.057404695, -0.769925907), (-0.02559692, -0.385048372), (-0.014994329, 0.000412438))
            Line((-0.014994329, 0.000412438), (0.000412438, 0.014994329))
            ThreePointArc((0.000412438, 0.014994329), (0.385873249, 0.004391737), (0.771917335, 0.014994329))
            Line((0.771917335, 0.014994329), (0.771504896, 0))
        make_face()
    fase1_piece_27a = extrude(amount=23.857524482, mode=Mode.PRIVATE)
    fase1_piece_27a = split(fase1_piece_27a, bisect_by=Plane(origin=(-53.75265478, 5.032763859, 7.317035106), z_dir=(0, -0.7071067811865476, 0.7071067811865475)), keep=Keep.TOP, mode=Mode.PRIVATE)
    with BuildSketch(Plane(origin=(-54, 0.13615914, 2.420430388), x_dir=(0.9996219169112968, 0.01944252080601436, -0.019442520806014357), z_dir=(0, 0.7071067811865475, 0.7071067811865476))) as fase1_piece_27b_section:
        with BuildLine():
            Line((0.771504896, 0), (-0.042410366, -0.770338345))
            Line((-0.042410366, -0.770338345), (-0.057404695, -0.769925907))
            ThreePointArc((-0.057404695, -0.769925907), (-0.02559692, -0.385048372), (-0.014994329, 0.000412438))
            Line((-0.014994329, 0.000412438), (0.000412438, 0.014994329))
            ThreePointArc((0.000412438, 0.014994329), (0.385873249, 0.004391737), (0.771917335, 0.014994329))
            Line((0.771917335, 0.014994329), (0.771504896, 0))
        make_face()
    fase1_piece_27b = extrude(amount=8.606261823, mode=Mode.PRIVATE)
    fase1_piece_27b = split(fase1_piece_27b, bisect_by=Plane(origin=(-53.75265478, 4.682964894, 7.317035106), z_dir=(0, 0.7071067811865438, 0.7071067811865513)), keep=Keep.TOP, mode=Mode.PRIVATE)
    fase1_piece_27 = fase1_piece_27a & fase1_piece_27b
    add(fase1_piece_27, mode=Mode.SUBTRACT)

    # Verrundung1
    verrundung1_edges = [part.edges().sort_by_distance(p)[0] for p in [
        (-34, 15.625, 0),
        (34, 15.625, 0),
    ]]
    fillet(verrundung1_edges, radius=VERRUNDUNG1_R)


solid = part.part
